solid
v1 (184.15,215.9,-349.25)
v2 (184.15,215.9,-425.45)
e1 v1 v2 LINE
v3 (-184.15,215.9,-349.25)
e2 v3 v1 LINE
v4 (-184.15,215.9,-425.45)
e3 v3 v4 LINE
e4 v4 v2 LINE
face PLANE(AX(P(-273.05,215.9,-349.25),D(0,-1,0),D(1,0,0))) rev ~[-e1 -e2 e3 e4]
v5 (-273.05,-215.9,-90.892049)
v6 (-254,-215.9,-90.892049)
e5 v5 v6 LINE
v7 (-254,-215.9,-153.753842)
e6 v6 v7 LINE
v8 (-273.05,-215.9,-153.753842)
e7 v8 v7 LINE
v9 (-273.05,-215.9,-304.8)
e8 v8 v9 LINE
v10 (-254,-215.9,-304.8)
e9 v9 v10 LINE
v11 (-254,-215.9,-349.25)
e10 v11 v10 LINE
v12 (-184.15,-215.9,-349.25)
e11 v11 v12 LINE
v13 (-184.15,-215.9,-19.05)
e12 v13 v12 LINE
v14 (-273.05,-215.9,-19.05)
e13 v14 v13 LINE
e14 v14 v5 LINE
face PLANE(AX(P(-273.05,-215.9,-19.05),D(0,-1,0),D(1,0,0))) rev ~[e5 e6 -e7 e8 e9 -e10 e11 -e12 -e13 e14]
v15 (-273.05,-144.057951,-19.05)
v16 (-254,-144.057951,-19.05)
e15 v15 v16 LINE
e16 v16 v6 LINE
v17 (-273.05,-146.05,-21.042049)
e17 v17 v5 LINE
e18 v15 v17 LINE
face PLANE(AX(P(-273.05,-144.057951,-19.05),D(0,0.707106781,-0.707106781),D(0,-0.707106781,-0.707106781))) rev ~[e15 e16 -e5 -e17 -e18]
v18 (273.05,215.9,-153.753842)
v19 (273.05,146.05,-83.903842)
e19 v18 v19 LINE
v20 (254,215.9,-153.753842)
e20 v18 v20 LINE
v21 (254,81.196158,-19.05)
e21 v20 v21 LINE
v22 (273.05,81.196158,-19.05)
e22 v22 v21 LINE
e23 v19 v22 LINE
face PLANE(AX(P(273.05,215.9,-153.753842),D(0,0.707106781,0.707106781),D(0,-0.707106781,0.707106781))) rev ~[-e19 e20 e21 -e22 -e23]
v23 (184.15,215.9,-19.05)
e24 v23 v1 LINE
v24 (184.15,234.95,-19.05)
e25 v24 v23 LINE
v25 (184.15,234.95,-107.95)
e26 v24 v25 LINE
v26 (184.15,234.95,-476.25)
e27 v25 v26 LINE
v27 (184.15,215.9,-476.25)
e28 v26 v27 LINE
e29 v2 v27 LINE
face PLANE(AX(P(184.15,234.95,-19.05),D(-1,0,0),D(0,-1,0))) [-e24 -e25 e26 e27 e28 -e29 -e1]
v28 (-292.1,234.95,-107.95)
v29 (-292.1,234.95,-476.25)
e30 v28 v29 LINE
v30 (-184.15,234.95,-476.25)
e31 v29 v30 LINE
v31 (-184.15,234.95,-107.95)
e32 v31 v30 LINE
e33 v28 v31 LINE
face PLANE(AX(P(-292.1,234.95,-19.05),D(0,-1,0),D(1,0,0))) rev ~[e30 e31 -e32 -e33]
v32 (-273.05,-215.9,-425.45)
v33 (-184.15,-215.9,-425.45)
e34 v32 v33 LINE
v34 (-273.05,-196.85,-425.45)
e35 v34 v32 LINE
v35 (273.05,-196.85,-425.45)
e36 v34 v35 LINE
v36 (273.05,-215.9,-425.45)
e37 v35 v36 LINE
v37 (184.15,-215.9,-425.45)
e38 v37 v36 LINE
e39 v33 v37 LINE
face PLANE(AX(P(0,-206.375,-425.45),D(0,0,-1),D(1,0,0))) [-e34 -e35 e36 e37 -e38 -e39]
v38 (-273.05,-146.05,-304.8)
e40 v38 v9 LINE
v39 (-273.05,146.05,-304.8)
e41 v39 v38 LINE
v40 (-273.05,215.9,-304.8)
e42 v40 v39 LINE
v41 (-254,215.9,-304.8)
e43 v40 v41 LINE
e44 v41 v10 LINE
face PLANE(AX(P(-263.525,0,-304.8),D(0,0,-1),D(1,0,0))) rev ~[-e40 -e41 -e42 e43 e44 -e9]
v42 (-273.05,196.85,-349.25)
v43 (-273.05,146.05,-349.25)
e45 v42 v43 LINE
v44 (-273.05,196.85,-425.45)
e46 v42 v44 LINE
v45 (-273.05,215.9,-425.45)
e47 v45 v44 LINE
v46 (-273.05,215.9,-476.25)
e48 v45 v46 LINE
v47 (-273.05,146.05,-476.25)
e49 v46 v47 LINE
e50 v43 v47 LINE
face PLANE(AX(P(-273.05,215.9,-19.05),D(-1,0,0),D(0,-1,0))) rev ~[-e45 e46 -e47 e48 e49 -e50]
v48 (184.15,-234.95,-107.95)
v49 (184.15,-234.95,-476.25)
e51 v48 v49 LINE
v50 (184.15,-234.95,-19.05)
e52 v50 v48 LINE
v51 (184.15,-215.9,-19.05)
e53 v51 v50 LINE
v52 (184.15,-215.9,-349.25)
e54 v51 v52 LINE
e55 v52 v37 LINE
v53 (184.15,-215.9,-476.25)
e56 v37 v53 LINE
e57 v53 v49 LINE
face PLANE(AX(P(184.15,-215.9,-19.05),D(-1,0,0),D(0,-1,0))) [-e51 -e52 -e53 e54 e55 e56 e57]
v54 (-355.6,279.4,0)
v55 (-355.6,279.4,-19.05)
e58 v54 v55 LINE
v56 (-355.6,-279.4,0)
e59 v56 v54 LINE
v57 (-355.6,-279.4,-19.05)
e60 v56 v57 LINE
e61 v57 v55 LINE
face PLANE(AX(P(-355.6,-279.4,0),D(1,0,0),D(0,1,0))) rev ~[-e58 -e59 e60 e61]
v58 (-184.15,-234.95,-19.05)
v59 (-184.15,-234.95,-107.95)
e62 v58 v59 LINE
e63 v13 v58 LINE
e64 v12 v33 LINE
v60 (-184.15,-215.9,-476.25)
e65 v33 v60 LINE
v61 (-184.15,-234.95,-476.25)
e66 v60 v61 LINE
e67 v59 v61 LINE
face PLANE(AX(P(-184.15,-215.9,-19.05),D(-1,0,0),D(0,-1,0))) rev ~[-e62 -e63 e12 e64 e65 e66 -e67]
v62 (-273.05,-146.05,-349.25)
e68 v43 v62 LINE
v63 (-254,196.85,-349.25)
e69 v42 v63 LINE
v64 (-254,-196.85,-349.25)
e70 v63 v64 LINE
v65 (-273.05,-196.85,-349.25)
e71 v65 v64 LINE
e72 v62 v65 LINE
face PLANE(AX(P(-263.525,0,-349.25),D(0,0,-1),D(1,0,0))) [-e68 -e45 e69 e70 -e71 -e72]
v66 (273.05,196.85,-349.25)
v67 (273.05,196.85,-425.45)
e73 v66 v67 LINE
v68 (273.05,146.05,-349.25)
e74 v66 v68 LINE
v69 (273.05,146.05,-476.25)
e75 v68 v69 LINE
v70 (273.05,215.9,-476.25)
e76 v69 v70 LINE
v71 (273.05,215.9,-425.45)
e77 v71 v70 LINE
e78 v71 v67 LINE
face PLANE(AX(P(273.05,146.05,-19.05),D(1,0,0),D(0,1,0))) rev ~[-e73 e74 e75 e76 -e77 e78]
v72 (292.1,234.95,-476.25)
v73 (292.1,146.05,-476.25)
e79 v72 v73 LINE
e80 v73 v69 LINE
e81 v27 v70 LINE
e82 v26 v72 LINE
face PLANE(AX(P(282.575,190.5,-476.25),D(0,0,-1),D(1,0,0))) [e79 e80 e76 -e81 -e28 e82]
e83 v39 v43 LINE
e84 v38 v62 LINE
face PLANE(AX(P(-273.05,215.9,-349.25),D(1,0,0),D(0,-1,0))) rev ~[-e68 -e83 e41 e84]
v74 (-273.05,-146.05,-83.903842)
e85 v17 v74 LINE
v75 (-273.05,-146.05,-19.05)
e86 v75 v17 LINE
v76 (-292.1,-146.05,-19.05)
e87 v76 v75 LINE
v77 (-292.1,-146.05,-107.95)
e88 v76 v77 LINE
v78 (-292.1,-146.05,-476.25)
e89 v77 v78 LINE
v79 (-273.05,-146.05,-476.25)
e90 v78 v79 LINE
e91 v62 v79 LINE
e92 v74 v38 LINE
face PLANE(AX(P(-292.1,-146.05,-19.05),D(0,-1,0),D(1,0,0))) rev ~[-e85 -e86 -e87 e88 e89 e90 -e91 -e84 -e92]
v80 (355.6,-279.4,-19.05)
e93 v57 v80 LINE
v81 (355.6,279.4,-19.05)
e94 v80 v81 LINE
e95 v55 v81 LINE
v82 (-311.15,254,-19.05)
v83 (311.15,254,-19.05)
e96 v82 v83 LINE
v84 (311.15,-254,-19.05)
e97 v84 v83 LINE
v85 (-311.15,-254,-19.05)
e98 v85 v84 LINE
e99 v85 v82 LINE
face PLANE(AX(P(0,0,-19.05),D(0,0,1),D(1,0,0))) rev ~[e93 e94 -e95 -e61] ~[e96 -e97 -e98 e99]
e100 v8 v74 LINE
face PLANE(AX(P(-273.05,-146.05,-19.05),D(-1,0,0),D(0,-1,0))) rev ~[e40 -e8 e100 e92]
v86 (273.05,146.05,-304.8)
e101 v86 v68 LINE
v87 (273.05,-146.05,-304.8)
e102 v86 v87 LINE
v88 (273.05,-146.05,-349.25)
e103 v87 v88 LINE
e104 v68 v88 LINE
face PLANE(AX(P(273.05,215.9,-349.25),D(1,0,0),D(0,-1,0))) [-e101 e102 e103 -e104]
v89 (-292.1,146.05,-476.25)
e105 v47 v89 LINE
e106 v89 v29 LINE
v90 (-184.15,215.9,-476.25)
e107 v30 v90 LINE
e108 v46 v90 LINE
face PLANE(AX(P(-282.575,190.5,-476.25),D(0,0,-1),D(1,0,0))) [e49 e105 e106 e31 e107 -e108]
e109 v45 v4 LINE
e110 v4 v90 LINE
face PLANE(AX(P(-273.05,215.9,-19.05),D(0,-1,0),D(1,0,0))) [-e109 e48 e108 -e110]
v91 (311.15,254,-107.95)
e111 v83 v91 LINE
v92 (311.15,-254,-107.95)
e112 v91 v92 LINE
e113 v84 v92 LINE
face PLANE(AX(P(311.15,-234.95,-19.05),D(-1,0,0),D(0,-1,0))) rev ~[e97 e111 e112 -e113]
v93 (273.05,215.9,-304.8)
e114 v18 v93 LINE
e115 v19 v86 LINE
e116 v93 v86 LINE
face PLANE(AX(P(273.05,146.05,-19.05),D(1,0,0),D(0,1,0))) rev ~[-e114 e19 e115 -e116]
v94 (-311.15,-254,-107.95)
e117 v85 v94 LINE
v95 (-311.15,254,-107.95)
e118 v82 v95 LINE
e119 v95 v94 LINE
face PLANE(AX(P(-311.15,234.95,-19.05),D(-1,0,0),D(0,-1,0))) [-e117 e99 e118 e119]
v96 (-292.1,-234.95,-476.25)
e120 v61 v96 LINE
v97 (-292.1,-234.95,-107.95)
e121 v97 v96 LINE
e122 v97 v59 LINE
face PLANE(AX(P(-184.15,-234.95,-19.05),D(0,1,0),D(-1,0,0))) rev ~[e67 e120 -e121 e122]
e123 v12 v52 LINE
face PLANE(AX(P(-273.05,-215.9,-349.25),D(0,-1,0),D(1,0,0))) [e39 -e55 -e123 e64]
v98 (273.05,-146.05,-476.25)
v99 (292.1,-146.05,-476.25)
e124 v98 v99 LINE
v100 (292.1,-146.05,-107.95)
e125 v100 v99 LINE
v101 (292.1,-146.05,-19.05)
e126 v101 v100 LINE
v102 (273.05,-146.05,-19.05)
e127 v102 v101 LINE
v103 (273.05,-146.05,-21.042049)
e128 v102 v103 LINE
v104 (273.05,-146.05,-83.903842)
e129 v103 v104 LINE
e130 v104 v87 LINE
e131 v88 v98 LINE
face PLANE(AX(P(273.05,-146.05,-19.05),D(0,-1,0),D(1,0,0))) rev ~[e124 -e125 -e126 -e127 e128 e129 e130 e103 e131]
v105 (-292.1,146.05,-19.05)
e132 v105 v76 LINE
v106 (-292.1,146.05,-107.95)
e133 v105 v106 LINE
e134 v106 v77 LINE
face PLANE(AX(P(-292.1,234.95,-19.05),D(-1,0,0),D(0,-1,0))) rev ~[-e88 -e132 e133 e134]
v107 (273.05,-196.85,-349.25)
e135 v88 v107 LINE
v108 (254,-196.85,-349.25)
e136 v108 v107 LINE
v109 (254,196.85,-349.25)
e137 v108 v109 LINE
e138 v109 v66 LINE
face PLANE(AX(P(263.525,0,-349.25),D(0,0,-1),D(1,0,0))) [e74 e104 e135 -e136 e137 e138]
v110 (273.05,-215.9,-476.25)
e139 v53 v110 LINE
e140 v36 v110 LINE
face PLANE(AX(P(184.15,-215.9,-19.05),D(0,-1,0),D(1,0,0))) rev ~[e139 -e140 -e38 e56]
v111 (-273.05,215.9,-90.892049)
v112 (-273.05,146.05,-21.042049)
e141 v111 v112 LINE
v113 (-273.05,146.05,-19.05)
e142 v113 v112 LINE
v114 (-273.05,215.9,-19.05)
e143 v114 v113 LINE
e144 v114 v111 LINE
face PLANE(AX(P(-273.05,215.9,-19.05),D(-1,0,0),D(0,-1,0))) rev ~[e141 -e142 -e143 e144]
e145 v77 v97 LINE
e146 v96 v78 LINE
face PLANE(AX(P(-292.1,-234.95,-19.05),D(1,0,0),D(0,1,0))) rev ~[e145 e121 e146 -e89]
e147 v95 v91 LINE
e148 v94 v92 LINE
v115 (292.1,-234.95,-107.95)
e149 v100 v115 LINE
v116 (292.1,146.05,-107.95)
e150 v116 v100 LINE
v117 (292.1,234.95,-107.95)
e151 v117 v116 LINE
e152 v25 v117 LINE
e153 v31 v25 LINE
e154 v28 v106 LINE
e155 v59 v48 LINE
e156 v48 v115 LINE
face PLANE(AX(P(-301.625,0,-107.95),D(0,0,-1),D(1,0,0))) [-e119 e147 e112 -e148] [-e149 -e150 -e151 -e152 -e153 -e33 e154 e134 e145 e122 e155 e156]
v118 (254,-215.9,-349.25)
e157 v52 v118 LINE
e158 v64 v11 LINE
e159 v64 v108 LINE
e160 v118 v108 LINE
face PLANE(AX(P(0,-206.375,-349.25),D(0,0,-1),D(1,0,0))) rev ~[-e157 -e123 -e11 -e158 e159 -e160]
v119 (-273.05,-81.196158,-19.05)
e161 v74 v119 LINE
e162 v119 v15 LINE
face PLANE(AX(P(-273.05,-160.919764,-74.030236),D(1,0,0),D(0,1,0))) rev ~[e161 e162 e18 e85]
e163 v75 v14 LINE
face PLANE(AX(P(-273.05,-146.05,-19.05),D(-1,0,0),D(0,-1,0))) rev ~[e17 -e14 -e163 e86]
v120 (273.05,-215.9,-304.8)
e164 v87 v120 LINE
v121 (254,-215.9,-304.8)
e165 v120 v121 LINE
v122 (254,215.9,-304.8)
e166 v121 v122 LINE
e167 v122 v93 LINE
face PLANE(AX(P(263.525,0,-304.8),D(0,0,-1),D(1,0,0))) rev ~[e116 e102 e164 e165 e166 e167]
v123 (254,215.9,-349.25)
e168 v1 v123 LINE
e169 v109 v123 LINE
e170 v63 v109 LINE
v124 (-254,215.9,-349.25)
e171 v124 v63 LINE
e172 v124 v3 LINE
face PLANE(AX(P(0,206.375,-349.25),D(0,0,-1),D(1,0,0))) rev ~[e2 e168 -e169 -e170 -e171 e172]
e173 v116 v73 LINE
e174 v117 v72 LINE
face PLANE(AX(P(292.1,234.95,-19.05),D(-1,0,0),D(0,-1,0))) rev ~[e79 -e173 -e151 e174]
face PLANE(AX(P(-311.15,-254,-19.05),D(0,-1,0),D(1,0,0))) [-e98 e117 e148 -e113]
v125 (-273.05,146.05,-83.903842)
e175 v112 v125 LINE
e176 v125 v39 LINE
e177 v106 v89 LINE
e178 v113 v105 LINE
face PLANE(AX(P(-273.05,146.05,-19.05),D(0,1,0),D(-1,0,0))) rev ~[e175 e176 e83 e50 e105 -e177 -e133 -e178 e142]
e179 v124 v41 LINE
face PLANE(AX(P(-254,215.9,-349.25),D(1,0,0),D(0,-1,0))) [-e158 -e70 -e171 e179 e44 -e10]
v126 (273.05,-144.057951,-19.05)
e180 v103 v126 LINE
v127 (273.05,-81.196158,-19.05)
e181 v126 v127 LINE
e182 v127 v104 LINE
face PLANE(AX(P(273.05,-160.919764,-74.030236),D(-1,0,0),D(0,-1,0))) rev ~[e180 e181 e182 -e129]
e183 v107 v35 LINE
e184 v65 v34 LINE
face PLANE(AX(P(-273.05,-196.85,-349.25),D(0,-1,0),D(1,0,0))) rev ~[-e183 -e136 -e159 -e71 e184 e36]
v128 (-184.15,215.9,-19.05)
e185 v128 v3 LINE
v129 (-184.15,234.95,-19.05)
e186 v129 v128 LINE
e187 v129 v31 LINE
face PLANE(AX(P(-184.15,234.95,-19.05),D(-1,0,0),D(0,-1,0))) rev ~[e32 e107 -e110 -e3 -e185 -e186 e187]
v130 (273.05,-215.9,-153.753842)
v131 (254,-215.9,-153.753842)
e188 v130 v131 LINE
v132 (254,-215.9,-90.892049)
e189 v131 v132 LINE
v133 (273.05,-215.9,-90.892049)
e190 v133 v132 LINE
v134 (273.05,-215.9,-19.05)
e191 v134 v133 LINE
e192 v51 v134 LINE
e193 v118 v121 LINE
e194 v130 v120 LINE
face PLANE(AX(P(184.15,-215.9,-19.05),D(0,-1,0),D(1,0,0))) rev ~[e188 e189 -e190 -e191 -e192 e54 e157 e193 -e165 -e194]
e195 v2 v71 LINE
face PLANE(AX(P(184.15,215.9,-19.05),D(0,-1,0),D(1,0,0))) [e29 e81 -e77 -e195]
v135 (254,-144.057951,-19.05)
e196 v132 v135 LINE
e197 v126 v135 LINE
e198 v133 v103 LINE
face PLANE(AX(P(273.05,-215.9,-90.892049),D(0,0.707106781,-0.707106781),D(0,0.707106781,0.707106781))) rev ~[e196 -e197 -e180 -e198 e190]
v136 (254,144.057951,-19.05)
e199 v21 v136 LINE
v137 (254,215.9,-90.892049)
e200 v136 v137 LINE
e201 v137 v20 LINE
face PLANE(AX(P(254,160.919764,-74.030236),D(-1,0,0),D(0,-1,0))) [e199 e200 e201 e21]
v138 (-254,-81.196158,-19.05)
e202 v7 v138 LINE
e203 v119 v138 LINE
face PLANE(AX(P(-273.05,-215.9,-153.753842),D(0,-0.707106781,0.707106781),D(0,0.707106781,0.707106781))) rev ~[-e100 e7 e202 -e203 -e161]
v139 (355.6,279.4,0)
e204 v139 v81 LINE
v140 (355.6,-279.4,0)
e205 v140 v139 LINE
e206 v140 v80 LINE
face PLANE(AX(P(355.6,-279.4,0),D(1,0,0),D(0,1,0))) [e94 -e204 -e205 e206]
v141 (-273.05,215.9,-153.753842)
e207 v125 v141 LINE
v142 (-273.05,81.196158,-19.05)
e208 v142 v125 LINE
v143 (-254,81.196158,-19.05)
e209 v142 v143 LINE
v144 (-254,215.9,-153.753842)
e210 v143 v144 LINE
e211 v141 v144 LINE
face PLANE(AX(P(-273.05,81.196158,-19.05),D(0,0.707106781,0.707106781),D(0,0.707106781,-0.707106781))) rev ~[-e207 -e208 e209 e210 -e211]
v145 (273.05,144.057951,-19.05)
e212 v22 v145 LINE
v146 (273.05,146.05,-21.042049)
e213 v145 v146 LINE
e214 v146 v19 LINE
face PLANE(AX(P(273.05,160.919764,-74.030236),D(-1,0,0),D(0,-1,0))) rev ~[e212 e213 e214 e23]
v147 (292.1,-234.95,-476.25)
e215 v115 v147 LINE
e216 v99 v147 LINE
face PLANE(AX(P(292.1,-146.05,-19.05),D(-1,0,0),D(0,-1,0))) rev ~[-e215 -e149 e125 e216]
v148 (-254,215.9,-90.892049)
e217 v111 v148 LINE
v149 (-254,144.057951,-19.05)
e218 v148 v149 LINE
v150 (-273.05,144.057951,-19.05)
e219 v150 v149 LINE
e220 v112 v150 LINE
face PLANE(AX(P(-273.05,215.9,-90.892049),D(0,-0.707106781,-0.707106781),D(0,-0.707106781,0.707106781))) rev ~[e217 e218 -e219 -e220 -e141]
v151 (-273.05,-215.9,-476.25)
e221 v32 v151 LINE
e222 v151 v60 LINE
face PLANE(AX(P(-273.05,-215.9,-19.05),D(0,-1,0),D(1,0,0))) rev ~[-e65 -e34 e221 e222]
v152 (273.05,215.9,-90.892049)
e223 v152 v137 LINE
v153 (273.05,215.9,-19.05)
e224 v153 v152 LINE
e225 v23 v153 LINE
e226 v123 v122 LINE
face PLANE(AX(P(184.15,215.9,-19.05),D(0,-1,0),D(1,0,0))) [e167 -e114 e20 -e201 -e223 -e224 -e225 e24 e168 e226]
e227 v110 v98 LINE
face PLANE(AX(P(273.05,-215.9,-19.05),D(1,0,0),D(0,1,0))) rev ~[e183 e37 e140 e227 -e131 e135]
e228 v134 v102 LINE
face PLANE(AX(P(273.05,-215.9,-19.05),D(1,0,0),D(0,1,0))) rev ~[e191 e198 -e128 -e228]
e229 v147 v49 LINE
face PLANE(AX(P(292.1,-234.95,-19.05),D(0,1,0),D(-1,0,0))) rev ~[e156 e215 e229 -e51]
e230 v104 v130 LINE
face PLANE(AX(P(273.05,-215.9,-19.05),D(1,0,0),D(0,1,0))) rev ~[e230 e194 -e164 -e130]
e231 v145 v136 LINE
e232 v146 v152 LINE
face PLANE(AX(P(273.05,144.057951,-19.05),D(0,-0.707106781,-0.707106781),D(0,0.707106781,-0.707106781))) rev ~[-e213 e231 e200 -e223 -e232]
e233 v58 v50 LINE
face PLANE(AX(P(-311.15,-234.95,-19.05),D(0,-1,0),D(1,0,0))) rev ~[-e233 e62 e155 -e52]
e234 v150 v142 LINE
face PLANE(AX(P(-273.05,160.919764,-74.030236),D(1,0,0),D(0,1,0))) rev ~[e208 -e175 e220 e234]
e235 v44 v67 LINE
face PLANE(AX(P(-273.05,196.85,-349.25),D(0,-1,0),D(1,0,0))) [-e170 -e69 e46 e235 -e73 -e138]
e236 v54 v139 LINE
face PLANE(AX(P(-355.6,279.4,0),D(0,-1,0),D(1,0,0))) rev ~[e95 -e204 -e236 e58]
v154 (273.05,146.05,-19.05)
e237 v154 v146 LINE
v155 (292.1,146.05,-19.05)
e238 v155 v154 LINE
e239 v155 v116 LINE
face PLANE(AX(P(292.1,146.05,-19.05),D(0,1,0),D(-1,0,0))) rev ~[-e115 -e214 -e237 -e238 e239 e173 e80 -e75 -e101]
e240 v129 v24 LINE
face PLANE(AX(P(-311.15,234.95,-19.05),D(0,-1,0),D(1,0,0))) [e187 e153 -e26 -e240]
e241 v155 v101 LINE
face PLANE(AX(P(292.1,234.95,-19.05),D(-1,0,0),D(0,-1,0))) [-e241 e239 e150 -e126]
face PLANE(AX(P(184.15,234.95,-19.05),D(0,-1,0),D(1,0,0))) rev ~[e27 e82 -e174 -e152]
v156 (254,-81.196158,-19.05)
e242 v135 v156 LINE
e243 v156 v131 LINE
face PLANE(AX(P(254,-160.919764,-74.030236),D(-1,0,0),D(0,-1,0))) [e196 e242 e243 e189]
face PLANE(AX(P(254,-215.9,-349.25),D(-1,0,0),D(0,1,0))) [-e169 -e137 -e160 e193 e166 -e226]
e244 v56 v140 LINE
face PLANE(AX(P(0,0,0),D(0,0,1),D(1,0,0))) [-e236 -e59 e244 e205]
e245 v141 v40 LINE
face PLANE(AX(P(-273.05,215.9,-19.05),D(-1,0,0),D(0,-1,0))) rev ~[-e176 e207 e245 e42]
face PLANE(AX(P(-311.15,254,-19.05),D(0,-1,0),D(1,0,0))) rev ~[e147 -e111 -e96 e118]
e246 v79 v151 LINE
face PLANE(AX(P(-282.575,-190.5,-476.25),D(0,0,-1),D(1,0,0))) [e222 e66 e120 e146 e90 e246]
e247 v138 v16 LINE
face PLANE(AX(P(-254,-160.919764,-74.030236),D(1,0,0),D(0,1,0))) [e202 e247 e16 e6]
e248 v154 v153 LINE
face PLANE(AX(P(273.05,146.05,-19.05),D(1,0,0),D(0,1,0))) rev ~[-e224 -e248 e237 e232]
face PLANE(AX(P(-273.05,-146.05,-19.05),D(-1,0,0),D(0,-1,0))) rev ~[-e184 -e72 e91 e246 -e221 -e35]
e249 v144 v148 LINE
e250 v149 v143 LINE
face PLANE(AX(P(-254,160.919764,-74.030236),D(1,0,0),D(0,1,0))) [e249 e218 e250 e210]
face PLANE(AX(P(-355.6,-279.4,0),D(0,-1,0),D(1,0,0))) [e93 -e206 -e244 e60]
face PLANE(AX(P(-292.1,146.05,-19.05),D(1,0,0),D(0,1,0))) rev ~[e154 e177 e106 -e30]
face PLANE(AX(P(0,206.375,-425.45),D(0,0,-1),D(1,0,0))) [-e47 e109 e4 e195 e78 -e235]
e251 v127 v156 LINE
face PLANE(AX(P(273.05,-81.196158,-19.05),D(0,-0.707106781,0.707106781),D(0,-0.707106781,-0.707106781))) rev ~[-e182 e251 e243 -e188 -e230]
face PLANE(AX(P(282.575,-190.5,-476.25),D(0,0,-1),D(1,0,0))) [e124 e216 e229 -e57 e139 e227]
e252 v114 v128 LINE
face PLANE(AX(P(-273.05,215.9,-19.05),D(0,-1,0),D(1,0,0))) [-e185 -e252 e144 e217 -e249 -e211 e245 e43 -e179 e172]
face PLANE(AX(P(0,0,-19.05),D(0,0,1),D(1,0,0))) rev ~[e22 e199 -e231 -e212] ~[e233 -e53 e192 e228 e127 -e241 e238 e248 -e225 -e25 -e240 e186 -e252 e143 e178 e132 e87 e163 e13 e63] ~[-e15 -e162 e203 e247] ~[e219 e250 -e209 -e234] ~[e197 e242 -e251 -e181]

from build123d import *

# Parameters (mm, degrees)
F0_W      = 711.2
F0_H      = 558.8
F1_DEPTH  = 19.05
F2_W      = 622.3
F2_H      = 19.05
F3_DEPTH  = 88.9
F4_W      = 19.05
F4_H      = 469.9
F5_DEPTH  = 88.9
F6_W      = 88.9
F6_H      = 19.05
F7_DEPTH  = 457.2
F9_W      = 546.1
F9_H      = 19.05
F10_DEPTH = 76.2
F11_W     = 19.05
F11_H     = 431.8
F12_DEPTH = 44.45
F14_DEPTH = 19.05
F16_DEPTH = 19.05


with BuildPart() as f1:
    # F0 (on Top) → F1 (new body)
    with BuildSketch(Plane.XY):
        Rectangle(F0_W, F0_H)
    extrude(amount=-F1_DEPTH)

    # F2 (on face) → F3 (join)
    with BuildSketch(Plane(origin=(0, 0, -19.05), x_dir=(1, 0, 0), z_dir=(0, 0, -1))):
        with Locations((0, 244.475)):
            Rectangle(F2_W, F2_H)
        with Locations((0, -244.475)):
            Rectangle(F2_W, F2_H)
    extrude(amount=F3_DEPTH)

    # F4 (on face) → F5 (join)
    with BuildSketch(Plane(origin=(0, 0, -19.05), x_dir=(1, 0, 0), z_dir=(0, 0, -1))):
        with Locations((-301.625, 0)):
            Rectangle(F4_W, F4_H)
        with Locations((301.625, 0)):
            Rectangle(F4_W, F4_H)
    extrude(amount=F5_DEPTH)

    # F6 (on face) → F7 (join)
    with BuildSketch(Plane(origin=(0, 0, -19.05), x_dir=(1, 0, 0), z_dir=(0, 0, -1))):
        Polygon((-273.05, 234.95), (-292.1, 234.95), (-292.1, 146.05), (-273.05, 146.05), (-273.05, 215.9), align=None)
        with Locations((-228.6, 225.425)):
            Rectangle(F6_W, F6_H)
        Polygon((292.1, 184.15), (292.1, 234.95), (273.05, 234.95), (273.05, 215.9), (273.05, 146.05), (292.1, 146.05), align=None)
        with Locations((228.6, 225.425)):
            Rectangle(F6_W, F6_H)
        Polygon((273.05, -234.95), (292.1, -234.95), (292.1, -184.15), (292.1, -146.05), (273.05, -146.05), (273.05, -215.9), align=None)
        with Locations((228.6, -225.425)):
            Rectangle(F6_W, F6_H)
        Polygon((-292.1, -146.05), (-292.1, -234.95), (-273.05, -234.95), (-273.05, -215.9), (-273.05, -146.05), align=None)
        with Locations((-228.6, -225.425)):
            Rectangle(F6_W, F6_H)
    extrude(amount=F7_DEPTH)

    # F9 (on face) → F10 (join)
    with BuildSketch(Plane(origin=(0, 0, -349.25), x_dir=(1, 0, 0), z_dir=(0, 0, -1))):
        with Locations((0, -206.375)):
            Rectangle(F9_W, F9_H)
        with Locations((0, 206.375)):
            Rectangle(F9_W, F9_H)
    extrude(amount=F10_DEPTH)

    # F11 (on face) → F12 (join)
    with BuildSketch(Plane(origin=(0, 0, -349.25), x_dir=(1, 0, 0), z_dir=(0, 0, -1))):
        Polygon((254, -215.9), (273.05, -215.9), (273.05, 215.9), (254, 215.9), (254, 0), align=None)
        with Locations((-263.525, 0)):
            Rectangle(F11_W, F11_H)
    extrude(amount=-F12_DEPTH)

    # F13 (on face) → F14 (join)
    with BuildSketch(Plane(origin=(273.05, 0, 0), x_dir=(0, -1, 0), z_dir=(-1, 0, 0))):
        Polygon((-144.0579510314, -19.05), (-215.9, -90.8920489686), (-215.9, -153.753841816), (-81.196158184, -19.05), align=None)
        Polygon((215.9, -153.753841816), (215.9, -90.8920489686), (144.0579510314, -19.05), (81.196158184, -19.05), align=None)
    extrude(amount=F14_DEPTH)

    # F15 (on face) → F16 (join)
    with BuildSketch(Plane.YZ.offset(-273.05)):
        Polygon((-144.0579510314, -19.05), (-215.9, -90.8920489686), (-215.9, -153.753841816), (-81.196158184, -19.05), align=None)
        Polygon((144.0579510314, -19.05), (81.196158184, -19.05), (215.9, -153.753841816), (215.9, -90.8920489686), align=None)
    extrude(amount=F16_DEPTH)


solid = f1.part
